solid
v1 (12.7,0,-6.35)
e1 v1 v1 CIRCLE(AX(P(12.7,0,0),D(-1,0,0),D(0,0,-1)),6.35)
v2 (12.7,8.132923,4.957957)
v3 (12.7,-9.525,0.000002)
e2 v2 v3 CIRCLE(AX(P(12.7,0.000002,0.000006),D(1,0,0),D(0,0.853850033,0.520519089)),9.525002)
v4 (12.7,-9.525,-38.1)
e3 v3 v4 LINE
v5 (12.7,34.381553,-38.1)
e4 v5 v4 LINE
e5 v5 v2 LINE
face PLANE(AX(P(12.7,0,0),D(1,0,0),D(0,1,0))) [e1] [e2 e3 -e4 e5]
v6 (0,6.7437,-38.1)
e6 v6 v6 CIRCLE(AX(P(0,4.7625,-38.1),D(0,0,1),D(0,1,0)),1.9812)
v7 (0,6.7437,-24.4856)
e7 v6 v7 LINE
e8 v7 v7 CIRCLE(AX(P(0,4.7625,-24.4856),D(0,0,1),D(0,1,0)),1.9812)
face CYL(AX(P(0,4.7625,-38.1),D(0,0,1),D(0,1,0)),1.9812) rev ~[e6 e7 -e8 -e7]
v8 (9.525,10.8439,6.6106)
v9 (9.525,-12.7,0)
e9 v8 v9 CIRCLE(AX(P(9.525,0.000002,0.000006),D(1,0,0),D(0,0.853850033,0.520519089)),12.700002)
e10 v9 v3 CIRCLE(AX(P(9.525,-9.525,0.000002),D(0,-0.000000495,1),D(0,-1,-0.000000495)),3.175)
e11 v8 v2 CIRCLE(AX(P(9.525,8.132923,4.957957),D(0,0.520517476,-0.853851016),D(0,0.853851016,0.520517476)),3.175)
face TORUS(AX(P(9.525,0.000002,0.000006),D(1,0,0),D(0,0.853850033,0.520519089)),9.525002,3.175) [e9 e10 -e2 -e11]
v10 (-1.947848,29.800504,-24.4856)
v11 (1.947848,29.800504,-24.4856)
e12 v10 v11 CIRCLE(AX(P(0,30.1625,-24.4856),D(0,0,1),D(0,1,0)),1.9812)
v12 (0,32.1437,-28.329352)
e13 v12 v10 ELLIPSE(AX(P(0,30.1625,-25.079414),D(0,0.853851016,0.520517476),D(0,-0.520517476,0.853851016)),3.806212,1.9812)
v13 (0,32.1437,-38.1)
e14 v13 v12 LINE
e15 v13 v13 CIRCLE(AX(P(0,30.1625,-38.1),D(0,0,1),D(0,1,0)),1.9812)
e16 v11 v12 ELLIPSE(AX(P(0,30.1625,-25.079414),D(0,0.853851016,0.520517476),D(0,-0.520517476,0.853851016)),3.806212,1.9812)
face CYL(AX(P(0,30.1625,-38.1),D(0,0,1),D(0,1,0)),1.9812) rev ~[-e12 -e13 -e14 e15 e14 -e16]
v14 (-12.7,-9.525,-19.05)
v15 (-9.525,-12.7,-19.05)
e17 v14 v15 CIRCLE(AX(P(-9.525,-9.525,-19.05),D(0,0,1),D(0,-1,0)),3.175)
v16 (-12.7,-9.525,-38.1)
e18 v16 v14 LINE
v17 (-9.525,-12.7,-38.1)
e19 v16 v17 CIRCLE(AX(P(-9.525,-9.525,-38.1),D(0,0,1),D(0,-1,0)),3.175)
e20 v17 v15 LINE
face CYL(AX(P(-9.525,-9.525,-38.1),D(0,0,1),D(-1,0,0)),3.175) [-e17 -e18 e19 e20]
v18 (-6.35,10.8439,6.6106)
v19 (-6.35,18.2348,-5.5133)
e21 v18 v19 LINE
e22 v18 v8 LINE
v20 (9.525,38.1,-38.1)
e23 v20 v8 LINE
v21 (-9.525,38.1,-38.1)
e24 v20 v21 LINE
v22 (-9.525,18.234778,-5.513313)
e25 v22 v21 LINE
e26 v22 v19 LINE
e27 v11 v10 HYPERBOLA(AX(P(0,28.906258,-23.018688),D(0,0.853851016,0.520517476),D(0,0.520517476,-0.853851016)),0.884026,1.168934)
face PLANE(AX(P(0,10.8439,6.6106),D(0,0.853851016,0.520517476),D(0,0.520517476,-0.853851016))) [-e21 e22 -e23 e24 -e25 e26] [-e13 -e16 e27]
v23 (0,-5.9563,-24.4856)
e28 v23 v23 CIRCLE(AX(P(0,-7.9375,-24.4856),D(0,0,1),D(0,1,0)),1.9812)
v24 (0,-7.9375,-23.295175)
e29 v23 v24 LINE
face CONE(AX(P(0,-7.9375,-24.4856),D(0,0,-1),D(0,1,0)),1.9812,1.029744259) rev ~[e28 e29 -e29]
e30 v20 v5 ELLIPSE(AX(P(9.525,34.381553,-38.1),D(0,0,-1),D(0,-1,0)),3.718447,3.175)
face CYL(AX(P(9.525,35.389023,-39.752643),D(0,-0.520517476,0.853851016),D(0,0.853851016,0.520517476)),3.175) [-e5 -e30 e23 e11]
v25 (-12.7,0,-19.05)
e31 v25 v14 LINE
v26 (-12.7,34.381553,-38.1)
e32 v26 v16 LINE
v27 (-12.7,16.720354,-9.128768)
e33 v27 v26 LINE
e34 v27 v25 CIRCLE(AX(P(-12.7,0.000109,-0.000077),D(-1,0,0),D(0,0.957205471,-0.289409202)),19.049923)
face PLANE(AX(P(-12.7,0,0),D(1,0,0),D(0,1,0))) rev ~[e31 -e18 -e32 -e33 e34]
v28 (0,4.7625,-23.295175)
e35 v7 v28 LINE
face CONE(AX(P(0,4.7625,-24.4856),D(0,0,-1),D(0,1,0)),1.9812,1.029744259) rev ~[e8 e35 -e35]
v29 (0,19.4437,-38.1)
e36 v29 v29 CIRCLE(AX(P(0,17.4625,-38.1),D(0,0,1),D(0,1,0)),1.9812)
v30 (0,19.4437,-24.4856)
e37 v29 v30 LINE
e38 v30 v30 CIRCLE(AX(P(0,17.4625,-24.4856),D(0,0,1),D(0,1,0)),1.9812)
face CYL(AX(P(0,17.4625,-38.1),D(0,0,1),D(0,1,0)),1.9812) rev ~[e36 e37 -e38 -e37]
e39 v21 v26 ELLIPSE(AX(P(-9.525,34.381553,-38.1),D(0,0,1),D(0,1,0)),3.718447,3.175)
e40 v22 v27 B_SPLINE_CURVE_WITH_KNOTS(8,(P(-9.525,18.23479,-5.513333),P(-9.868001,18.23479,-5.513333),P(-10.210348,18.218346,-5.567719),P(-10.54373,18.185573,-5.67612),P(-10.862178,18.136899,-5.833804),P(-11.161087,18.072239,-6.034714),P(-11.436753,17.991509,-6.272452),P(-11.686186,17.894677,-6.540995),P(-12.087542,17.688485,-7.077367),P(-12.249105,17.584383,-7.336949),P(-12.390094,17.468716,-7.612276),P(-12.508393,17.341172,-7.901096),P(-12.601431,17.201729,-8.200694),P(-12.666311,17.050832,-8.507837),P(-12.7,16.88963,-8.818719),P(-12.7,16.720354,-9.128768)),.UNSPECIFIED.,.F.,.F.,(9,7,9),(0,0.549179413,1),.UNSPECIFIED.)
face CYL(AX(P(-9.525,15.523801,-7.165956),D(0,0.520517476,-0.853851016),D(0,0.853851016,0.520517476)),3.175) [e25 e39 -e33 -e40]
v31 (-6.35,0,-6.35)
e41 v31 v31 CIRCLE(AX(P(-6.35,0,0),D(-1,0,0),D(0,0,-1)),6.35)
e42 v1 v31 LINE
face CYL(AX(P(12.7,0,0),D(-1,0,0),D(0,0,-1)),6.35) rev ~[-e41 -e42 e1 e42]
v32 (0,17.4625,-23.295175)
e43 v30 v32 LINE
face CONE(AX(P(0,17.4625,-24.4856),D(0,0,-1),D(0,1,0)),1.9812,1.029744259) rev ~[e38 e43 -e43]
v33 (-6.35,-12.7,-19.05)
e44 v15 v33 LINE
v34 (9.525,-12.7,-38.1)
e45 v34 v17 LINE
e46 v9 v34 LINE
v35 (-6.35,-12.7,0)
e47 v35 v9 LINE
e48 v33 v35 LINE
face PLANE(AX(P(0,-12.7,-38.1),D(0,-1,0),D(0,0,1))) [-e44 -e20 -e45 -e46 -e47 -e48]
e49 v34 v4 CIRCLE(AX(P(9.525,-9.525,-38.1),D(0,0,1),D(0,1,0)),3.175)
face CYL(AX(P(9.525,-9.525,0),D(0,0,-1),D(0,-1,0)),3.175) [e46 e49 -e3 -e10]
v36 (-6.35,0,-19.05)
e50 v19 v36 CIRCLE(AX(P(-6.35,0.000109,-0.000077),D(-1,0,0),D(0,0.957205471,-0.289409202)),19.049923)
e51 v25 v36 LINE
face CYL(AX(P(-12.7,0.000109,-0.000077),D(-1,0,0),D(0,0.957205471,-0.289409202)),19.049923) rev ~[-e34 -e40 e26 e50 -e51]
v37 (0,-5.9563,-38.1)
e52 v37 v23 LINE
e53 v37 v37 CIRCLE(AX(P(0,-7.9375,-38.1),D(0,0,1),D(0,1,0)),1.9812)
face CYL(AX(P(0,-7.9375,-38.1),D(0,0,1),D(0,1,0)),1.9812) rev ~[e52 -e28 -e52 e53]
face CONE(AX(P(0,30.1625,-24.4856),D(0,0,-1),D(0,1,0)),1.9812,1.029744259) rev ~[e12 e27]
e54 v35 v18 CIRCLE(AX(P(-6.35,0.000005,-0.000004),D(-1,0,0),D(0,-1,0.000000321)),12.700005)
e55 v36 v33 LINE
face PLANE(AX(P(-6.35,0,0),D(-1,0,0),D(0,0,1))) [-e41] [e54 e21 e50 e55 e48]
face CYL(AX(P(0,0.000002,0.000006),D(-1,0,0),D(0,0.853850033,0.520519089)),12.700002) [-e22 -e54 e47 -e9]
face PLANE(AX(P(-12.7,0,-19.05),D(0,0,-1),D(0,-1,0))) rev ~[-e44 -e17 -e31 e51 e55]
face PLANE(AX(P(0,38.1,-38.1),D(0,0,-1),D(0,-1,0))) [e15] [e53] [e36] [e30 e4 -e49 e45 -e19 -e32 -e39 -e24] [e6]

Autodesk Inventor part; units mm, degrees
ref_plane "YZ Plane" through (0, 0, 0) normal (1, 0, 0) x (0, 1, 0)
ref_plane "XZ Plane" through (0, 0, 0) normal (0, 1, 0) x (-1, 0, 0)
ref_plane "XY Plane" through (0, 0, 0) normal (0, 0, 1) x (1, 0, 0)
sketch "Sketch2" plane through (0, 0, 0) normal (1, 0, 0) x (0, 1, 0)
  arc A0 (10.8439, 6.6106) -> (-12.7, 0) centre (0, 0) ccw
  line L0 (10.8439, 6.6106) -> (38.1, -38.1)
  line L1 (38.1, -38.1) -> (-12.7, -38.1)
  line L2 (-12.7, -38.1) -> (-12.7, 0)
  line L3 (-25.8661, 0) -> (48.761, 0) construction
  dimension "d0" = 12.7
  dimension "d1" = 50.8
  dimension "d2" = 38.1
extrude "Extrusion1" add sketch "Sketch2" along normal mid plane 25.4
sketch "Sketch4" plane through (12.7, 0, 0) normal (1, 0, 0) x (0, 0, -1)
  point P0 (0, 0)
  point P1 (0, 0)
hole "Hole1" at (12.7, 0, 0) direction (-1, 0, 0) diameter 12.7 end through all
sketch "Sketch3" plane through (-12.7, 0, 0) normal (-1, 0, 0) x (0, 0, 1)
  arc A0 (-5.5133, 18.2348) -> (-19.05, 0) centre (0, 0) ccw
  circle A1 centre (0, 0) radius 6.35 construction
  arc A2 (0, -12.7) -> (6.6106, 10.8439) centre (0, 0) ccw projected
  line L0 (6.6106, 10.8439) -> (-38.1, 38.1) projected
  line L1 (-38.1, 38.1) -> (-38.1, -12.7) construction
  line L2 (-38.1, -12.7) -> (0, -12.7) projected
  line L3 (-19.05, 0) -> (-19.05, -12.7)
  dimension "d5" = 38.1
extrude "Extrusion2" cut sketch "Sketch3" against normal blind 6.35
sketch "Sketch5" plane through (12.7, 38.1, -38.1) normal (0, 0, -1) x (-1, 0, 0)
  line L0 (12.7, -60.96) -> (12.7, 10.16) construction
  point P0 (12.7, -38.1)
  point P1 (12.7, -46.0375)
  dimension "d15" = 7.9375
hole "Hole2" at (0, -7.9375, -38.1) direction (0, 0, 1) diameter 3.9624 depth 13.6144 tip angle 118 thread size "10-32 UNF" class "2B" standard "ANSI Unified Screw Threads"
pattern_linear "Rectangular Pattern1" count 4 spacing 12.7 along (0, 1, 0) of "Hole2"
fillet "Fillet1" radius 3.175 5 edges at (12.7, -3.4331, 12.2272) (12.7, -12.7, -19.05) (12.7, 24.472, -15.7447) (-12.7, 28.1674, -21.8066) (-12.7, -12.7, -28.575)
properties part number "MOUNT,SPRING,ELEVATOR" material "3D Print Material - chopped carbon Nylon12 (preferred)"
